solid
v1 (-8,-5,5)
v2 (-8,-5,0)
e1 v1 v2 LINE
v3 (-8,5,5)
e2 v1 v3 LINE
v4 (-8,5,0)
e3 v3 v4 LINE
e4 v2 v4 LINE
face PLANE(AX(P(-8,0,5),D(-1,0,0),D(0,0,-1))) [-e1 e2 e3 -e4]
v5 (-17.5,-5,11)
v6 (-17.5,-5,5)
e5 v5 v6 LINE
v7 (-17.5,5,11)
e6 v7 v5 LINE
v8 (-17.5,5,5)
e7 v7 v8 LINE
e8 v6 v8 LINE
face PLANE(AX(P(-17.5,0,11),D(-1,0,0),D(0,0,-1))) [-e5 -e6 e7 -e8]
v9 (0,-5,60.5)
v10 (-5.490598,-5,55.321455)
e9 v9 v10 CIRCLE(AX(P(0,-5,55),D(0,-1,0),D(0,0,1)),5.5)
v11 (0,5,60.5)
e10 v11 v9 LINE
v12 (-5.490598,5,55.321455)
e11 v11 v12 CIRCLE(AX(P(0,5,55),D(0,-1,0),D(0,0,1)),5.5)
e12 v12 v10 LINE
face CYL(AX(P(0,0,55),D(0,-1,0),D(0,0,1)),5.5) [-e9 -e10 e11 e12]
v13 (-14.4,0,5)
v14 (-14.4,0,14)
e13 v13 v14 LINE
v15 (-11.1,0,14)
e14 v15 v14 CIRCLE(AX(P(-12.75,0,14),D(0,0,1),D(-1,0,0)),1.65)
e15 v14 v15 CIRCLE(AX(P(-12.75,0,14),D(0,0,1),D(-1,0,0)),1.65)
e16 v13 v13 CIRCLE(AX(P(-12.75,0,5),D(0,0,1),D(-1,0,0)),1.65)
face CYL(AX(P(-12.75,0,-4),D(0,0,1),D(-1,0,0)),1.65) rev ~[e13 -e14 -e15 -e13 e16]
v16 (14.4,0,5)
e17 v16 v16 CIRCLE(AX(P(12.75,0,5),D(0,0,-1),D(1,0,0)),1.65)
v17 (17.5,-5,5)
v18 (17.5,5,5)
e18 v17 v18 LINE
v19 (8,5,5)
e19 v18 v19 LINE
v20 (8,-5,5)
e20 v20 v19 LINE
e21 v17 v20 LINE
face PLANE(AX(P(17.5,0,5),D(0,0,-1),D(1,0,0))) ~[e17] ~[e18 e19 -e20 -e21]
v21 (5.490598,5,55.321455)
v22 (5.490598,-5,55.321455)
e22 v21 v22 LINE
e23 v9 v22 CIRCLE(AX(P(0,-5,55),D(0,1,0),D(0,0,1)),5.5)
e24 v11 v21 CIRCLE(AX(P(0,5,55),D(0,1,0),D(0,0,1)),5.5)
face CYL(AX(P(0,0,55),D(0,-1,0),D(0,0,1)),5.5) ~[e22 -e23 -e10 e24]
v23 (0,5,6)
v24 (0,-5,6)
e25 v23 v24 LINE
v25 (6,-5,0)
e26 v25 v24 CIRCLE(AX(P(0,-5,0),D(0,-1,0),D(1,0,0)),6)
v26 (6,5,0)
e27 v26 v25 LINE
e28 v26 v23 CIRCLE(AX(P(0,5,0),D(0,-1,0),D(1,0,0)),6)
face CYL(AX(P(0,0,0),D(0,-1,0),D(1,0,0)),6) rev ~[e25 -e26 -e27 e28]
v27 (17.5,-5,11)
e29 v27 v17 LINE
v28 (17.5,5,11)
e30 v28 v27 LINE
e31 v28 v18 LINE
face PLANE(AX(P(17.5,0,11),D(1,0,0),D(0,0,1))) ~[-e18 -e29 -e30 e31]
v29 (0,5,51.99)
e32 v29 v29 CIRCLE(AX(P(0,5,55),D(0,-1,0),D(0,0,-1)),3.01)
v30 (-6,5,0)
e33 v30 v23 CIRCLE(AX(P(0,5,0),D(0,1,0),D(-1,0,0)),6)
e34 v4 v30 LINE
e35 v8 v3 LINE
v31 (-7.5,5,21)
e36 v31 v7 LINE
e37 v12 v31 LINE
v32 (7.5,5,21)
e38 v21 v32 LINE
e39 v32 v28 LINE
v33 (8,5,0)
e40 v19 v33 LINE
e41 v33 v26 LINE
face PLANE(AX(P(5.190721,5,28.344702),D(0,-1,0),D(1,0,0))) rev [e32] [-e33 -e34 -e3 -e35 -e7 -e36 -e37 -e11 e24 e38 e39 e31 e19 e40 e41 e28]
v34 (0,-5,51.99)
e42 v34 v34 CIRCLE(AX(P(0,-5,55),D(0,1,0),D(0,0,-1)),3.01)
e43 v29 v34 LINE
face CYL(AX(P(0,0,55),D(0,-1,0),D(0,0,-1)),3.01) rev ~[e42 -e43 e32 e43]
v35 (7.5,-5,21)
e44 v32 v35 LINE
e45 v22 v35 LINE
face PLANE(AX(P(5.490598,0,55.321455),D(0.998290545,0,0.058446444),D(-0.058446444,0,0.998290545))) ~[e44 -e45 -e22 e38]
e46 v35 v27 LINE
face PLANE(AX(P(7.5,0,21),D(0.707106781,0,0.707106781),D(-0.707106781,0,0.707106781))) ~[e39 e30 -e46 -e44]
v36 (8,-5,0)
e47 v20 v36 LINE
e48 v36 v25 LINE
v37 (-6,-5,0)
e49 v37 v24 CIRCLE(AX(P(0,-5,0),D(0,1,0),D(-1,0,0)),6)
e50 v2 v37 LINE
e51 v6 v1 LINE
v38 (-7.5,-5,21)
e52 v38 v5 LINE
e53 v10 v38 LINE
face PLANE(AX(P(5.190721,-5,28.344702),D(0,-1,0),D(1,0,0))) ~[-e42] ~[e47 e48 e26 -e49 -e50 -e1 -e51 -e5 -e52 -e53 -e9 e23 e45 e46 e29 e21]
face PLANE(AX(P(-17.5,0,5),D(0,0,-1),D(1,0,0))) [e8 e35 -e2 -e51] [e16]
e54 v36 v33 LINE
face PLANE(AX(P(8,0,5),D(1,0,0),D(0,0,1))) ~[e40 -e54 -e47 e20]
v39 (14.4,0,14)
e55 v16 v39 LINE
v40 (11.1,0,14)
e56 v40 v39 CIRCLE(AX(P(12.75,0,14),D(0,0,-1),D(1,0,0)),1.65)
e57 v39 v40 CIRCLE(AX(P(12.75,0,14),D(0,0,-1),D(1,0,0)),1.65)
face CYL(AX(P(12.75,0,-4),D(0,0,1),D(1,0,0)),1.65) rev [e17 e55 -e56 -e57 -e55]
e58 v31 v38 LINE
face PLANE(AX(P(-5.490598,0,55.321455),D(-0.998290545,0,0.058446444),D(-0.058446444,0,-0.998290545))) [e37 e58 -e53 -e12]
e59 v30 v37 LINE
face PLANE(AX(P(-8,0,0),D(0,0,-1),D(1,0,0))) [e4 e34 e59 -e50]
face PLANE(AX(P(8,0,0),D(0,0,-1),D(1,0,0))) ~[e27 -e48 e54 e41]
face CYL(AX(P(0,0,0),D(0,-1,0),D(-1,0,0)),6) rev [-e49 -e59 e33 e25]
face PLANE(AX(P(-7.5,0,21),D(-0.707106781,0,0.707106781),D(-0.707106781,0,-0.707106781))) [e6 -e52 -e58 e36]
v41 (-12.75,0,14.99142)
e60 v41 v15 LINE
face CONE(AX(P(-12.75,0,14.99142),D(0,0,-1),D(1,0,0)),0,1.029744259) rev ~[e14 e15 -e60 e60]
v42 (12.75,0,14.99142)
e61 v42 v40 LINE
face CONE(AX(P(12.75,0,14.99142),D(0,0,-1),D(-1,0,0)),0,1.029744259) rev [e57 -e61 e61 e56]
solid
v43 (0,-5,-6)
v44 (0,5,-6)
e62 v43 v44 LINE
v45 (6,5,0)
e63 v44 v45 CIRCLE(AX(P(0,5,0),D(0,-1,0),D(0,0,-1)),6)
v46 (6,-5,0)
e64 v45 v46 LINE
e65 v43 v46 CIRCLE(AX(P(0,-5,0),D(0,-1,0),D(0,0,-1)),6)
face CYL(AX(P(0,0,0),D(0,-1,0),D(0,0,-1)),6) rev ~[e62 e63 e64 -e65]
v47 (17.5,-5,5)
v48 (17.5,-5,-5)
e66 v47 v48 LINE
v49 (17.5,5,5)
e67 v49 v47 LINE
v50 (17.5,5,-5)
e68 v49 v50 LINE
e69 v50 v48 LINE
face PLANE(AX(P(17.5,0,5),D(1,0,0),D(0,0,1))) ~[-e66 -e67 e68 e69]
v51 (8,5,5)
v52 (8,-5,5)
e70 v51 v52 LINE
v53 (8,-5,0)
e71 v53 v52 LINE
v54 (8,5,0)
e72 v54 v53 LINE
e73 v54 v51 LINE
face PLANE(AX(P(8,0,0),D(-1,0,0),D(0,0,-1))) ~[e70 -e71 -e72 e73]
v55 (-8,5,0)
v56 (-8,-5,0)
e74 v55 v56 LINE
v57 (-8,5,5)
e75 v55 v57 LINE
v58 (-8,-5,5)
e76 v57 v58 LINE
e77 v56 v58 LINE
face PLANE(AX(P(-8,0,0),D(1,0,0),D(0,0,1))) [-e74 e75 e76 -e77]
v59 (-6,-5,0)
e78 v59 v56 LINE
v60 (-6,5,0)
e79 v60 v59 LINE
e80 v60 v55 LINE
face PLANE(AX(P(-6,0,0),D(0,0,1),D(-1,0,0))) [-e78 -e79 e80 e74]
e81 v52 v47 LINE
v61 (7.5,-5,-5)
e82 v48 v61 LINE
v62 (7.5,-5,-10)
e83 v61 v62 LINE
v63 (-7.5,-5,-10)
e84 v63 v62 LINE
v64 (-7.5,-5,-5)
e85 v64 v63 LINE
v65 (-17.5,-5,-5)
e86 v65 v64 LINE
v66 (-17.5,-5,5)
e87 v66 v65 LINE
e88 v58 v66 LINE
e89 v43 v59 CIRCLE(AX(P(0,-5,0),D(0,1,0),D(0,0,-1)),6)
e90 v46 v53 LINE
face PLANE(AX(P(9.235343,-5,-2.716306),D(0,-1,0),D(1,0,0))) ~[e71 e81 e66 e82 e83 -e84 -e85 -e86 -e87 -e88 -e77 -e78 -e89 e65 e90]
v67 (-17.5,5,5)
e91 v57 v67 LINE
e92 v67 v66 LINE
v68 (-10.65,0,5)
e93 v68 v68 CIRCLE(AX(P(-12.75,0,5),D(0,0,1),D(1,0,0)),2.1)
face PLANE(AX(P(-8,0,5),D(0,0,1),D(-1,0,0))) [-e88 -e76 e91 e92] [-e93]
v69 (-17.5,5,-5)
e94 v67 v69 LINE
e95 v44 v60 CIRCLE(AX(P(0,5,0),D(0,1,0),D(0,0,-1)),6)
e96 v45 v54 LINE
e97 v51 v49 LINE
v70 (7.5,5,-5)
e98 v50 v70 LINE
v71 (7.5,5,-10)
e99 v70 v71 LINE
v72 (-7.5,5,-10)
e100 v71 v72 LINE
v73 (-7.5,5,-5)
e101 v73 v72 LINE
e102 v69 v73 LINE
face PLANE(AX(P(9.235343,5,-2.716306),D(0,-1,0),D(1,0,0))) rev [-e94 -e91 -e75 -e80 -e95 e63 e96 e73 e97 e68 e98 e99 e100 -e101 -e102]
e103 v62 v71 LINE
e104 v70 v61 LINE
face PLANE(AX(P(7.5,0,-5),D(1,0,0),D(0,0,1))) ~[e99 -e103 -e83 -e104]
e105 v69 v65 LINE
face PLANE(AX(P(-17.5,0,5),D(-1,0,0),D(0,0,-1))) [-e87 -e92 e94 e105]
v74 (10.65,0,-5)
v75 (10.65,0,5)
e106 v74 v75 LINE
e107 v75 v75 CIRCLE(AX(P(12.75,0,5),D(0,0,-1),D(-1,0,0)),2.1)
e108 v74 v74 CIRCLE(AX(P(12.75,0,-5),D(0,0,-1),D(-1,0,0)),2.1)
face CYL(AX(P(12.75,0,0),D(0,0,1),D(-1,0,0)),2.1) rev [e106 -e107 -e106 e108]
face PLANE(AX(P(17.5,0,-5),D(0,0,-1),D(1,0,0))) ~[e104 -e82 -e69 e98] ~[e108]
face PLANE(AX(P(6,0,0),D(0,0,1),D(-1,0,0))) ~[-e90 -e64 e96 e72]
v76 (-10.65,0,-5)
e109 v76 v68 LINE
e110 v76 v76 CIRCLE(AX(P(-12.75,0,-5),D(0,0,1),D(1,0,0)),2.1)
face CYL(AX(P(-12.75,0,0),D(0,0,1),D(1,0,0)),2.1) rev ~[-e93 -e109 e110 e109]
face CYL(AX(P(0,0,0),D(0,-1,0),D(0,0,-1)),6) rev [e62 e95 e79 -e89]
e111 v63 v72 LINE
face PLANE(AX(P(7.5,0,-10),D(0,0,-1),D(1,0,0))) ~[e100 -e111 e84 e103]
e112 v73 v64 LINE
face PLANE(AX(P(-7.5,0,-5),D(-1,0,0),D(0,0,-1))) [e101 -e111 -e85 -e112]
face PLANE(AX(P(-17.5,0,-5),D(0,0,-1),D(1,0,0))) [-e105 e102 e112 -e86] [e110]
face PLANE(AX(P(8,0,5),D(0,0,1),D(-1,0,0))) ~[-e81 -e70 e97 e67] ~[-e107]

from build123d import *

# Parameters (mm, degrees)
F1_DEPTH      = 5
F2_R          = 2.1
F3_DEPTH      = 12.5
F6_DEPTH      = 5
F6_DEPTH_BACK = 5
F8_D          = 3.3
F8_DEPTH      = 9
F8_TIP        = 0.9914200214


with BuildPart() as f1:
    # F0 (on Front) → F1 (new body, symmetric)
    with BuildSketch(Plane.XZ):
        with BuildLine():
            ThreePointArc((0, -6), (-4.2426406871, -4.2426406871), (-6, 0))
            Line((-6, 0), (-8, 0))
            Line((-8, 0), (-8, 5))
            Line((-8, 5), (-17.5, 5))
            Line((-17.5, 5), (-17.5, -5))
            Line((-17.5, -5), (-7.5, -5))
            Line((-7.5, -5), (-7.5, -10))
            Line((-7.5, -10), (0, -10))
            Line((0, -10), (0, -6))
        make_face()
    extrude(amount=F1_DEPTH, both=True)

    # F2 (on Top) → F3 (cut, symmetric)
    with BuildSketch(Plane.XY):
        with Locations((-12.75, 0)):
            Circle(F2_R)
    extrude(amount=F3_DEPTH, both=True, mode=Mode.SUBTRACT)

    # F4: F1 across plane


with BuildPart() as f1_1:
    add(f1.part)
    add(f1.part.mirror(Plane.YZ))


with BuildPart() as f6:
    # F5 (on Front) → F6 (new body, two sides)
    with BuildSketch(Plane.XZ) as f6_sk:
        with BuildLine():
            Line((-8, 0), (-6, 0))
            ThreePointArc((-6, 0), (-4.2426406871, 4.2426406871), (0, 6))
            Line((0, 6), (0, 51.99))
            ThreePointArc((0, 51.99), (-3.01, 55), (0, 58.01))
            Line((0, 58.01), (0, 60.5))
            ThreePointArc((0, 60.5), (-3.7737246239, 59.0011251497), (-5.4905980002, 55.3214554412))
            Line((-5.4905980002, 55.3214554412), (-7.5, 21))
            Line((-7.5, 21), (-17.5, 11))
            Line((-17.5, 11), (-17.5, 5))
            Line((-17.5, 5), (-8, 5))
            Line((-8, 5), (-8, 0))
        make_face()
    extrude(amount=F6_DEPTH)
    extrude(f6_sk.sketch, amount=-F6_DEPTH_BACK)

    # F8
    with Locations(Plane(origin=(0, 0, 5), x_dir=(1, 0, 0), z_dir=(0, 0, -1))):
        with Locations((-12.75, 0)):
            Hole(F8_D / 2, depth=F8_DEPTH)
            with Locations((0, 0, -(F8_DEPTH + F8_TIP / 2))):  # 118° drill point
                Cone(0, F8_D / 2, F8_TIP, mode=Mode.SUBTRACT)

    # F9: F6 across plane


with BuildPart() as f6_1:
    add(f6.part)
    add(f6.part.mirror(Plane.YZ))


solid = Compound([f1_1.part, f6_1.part])
